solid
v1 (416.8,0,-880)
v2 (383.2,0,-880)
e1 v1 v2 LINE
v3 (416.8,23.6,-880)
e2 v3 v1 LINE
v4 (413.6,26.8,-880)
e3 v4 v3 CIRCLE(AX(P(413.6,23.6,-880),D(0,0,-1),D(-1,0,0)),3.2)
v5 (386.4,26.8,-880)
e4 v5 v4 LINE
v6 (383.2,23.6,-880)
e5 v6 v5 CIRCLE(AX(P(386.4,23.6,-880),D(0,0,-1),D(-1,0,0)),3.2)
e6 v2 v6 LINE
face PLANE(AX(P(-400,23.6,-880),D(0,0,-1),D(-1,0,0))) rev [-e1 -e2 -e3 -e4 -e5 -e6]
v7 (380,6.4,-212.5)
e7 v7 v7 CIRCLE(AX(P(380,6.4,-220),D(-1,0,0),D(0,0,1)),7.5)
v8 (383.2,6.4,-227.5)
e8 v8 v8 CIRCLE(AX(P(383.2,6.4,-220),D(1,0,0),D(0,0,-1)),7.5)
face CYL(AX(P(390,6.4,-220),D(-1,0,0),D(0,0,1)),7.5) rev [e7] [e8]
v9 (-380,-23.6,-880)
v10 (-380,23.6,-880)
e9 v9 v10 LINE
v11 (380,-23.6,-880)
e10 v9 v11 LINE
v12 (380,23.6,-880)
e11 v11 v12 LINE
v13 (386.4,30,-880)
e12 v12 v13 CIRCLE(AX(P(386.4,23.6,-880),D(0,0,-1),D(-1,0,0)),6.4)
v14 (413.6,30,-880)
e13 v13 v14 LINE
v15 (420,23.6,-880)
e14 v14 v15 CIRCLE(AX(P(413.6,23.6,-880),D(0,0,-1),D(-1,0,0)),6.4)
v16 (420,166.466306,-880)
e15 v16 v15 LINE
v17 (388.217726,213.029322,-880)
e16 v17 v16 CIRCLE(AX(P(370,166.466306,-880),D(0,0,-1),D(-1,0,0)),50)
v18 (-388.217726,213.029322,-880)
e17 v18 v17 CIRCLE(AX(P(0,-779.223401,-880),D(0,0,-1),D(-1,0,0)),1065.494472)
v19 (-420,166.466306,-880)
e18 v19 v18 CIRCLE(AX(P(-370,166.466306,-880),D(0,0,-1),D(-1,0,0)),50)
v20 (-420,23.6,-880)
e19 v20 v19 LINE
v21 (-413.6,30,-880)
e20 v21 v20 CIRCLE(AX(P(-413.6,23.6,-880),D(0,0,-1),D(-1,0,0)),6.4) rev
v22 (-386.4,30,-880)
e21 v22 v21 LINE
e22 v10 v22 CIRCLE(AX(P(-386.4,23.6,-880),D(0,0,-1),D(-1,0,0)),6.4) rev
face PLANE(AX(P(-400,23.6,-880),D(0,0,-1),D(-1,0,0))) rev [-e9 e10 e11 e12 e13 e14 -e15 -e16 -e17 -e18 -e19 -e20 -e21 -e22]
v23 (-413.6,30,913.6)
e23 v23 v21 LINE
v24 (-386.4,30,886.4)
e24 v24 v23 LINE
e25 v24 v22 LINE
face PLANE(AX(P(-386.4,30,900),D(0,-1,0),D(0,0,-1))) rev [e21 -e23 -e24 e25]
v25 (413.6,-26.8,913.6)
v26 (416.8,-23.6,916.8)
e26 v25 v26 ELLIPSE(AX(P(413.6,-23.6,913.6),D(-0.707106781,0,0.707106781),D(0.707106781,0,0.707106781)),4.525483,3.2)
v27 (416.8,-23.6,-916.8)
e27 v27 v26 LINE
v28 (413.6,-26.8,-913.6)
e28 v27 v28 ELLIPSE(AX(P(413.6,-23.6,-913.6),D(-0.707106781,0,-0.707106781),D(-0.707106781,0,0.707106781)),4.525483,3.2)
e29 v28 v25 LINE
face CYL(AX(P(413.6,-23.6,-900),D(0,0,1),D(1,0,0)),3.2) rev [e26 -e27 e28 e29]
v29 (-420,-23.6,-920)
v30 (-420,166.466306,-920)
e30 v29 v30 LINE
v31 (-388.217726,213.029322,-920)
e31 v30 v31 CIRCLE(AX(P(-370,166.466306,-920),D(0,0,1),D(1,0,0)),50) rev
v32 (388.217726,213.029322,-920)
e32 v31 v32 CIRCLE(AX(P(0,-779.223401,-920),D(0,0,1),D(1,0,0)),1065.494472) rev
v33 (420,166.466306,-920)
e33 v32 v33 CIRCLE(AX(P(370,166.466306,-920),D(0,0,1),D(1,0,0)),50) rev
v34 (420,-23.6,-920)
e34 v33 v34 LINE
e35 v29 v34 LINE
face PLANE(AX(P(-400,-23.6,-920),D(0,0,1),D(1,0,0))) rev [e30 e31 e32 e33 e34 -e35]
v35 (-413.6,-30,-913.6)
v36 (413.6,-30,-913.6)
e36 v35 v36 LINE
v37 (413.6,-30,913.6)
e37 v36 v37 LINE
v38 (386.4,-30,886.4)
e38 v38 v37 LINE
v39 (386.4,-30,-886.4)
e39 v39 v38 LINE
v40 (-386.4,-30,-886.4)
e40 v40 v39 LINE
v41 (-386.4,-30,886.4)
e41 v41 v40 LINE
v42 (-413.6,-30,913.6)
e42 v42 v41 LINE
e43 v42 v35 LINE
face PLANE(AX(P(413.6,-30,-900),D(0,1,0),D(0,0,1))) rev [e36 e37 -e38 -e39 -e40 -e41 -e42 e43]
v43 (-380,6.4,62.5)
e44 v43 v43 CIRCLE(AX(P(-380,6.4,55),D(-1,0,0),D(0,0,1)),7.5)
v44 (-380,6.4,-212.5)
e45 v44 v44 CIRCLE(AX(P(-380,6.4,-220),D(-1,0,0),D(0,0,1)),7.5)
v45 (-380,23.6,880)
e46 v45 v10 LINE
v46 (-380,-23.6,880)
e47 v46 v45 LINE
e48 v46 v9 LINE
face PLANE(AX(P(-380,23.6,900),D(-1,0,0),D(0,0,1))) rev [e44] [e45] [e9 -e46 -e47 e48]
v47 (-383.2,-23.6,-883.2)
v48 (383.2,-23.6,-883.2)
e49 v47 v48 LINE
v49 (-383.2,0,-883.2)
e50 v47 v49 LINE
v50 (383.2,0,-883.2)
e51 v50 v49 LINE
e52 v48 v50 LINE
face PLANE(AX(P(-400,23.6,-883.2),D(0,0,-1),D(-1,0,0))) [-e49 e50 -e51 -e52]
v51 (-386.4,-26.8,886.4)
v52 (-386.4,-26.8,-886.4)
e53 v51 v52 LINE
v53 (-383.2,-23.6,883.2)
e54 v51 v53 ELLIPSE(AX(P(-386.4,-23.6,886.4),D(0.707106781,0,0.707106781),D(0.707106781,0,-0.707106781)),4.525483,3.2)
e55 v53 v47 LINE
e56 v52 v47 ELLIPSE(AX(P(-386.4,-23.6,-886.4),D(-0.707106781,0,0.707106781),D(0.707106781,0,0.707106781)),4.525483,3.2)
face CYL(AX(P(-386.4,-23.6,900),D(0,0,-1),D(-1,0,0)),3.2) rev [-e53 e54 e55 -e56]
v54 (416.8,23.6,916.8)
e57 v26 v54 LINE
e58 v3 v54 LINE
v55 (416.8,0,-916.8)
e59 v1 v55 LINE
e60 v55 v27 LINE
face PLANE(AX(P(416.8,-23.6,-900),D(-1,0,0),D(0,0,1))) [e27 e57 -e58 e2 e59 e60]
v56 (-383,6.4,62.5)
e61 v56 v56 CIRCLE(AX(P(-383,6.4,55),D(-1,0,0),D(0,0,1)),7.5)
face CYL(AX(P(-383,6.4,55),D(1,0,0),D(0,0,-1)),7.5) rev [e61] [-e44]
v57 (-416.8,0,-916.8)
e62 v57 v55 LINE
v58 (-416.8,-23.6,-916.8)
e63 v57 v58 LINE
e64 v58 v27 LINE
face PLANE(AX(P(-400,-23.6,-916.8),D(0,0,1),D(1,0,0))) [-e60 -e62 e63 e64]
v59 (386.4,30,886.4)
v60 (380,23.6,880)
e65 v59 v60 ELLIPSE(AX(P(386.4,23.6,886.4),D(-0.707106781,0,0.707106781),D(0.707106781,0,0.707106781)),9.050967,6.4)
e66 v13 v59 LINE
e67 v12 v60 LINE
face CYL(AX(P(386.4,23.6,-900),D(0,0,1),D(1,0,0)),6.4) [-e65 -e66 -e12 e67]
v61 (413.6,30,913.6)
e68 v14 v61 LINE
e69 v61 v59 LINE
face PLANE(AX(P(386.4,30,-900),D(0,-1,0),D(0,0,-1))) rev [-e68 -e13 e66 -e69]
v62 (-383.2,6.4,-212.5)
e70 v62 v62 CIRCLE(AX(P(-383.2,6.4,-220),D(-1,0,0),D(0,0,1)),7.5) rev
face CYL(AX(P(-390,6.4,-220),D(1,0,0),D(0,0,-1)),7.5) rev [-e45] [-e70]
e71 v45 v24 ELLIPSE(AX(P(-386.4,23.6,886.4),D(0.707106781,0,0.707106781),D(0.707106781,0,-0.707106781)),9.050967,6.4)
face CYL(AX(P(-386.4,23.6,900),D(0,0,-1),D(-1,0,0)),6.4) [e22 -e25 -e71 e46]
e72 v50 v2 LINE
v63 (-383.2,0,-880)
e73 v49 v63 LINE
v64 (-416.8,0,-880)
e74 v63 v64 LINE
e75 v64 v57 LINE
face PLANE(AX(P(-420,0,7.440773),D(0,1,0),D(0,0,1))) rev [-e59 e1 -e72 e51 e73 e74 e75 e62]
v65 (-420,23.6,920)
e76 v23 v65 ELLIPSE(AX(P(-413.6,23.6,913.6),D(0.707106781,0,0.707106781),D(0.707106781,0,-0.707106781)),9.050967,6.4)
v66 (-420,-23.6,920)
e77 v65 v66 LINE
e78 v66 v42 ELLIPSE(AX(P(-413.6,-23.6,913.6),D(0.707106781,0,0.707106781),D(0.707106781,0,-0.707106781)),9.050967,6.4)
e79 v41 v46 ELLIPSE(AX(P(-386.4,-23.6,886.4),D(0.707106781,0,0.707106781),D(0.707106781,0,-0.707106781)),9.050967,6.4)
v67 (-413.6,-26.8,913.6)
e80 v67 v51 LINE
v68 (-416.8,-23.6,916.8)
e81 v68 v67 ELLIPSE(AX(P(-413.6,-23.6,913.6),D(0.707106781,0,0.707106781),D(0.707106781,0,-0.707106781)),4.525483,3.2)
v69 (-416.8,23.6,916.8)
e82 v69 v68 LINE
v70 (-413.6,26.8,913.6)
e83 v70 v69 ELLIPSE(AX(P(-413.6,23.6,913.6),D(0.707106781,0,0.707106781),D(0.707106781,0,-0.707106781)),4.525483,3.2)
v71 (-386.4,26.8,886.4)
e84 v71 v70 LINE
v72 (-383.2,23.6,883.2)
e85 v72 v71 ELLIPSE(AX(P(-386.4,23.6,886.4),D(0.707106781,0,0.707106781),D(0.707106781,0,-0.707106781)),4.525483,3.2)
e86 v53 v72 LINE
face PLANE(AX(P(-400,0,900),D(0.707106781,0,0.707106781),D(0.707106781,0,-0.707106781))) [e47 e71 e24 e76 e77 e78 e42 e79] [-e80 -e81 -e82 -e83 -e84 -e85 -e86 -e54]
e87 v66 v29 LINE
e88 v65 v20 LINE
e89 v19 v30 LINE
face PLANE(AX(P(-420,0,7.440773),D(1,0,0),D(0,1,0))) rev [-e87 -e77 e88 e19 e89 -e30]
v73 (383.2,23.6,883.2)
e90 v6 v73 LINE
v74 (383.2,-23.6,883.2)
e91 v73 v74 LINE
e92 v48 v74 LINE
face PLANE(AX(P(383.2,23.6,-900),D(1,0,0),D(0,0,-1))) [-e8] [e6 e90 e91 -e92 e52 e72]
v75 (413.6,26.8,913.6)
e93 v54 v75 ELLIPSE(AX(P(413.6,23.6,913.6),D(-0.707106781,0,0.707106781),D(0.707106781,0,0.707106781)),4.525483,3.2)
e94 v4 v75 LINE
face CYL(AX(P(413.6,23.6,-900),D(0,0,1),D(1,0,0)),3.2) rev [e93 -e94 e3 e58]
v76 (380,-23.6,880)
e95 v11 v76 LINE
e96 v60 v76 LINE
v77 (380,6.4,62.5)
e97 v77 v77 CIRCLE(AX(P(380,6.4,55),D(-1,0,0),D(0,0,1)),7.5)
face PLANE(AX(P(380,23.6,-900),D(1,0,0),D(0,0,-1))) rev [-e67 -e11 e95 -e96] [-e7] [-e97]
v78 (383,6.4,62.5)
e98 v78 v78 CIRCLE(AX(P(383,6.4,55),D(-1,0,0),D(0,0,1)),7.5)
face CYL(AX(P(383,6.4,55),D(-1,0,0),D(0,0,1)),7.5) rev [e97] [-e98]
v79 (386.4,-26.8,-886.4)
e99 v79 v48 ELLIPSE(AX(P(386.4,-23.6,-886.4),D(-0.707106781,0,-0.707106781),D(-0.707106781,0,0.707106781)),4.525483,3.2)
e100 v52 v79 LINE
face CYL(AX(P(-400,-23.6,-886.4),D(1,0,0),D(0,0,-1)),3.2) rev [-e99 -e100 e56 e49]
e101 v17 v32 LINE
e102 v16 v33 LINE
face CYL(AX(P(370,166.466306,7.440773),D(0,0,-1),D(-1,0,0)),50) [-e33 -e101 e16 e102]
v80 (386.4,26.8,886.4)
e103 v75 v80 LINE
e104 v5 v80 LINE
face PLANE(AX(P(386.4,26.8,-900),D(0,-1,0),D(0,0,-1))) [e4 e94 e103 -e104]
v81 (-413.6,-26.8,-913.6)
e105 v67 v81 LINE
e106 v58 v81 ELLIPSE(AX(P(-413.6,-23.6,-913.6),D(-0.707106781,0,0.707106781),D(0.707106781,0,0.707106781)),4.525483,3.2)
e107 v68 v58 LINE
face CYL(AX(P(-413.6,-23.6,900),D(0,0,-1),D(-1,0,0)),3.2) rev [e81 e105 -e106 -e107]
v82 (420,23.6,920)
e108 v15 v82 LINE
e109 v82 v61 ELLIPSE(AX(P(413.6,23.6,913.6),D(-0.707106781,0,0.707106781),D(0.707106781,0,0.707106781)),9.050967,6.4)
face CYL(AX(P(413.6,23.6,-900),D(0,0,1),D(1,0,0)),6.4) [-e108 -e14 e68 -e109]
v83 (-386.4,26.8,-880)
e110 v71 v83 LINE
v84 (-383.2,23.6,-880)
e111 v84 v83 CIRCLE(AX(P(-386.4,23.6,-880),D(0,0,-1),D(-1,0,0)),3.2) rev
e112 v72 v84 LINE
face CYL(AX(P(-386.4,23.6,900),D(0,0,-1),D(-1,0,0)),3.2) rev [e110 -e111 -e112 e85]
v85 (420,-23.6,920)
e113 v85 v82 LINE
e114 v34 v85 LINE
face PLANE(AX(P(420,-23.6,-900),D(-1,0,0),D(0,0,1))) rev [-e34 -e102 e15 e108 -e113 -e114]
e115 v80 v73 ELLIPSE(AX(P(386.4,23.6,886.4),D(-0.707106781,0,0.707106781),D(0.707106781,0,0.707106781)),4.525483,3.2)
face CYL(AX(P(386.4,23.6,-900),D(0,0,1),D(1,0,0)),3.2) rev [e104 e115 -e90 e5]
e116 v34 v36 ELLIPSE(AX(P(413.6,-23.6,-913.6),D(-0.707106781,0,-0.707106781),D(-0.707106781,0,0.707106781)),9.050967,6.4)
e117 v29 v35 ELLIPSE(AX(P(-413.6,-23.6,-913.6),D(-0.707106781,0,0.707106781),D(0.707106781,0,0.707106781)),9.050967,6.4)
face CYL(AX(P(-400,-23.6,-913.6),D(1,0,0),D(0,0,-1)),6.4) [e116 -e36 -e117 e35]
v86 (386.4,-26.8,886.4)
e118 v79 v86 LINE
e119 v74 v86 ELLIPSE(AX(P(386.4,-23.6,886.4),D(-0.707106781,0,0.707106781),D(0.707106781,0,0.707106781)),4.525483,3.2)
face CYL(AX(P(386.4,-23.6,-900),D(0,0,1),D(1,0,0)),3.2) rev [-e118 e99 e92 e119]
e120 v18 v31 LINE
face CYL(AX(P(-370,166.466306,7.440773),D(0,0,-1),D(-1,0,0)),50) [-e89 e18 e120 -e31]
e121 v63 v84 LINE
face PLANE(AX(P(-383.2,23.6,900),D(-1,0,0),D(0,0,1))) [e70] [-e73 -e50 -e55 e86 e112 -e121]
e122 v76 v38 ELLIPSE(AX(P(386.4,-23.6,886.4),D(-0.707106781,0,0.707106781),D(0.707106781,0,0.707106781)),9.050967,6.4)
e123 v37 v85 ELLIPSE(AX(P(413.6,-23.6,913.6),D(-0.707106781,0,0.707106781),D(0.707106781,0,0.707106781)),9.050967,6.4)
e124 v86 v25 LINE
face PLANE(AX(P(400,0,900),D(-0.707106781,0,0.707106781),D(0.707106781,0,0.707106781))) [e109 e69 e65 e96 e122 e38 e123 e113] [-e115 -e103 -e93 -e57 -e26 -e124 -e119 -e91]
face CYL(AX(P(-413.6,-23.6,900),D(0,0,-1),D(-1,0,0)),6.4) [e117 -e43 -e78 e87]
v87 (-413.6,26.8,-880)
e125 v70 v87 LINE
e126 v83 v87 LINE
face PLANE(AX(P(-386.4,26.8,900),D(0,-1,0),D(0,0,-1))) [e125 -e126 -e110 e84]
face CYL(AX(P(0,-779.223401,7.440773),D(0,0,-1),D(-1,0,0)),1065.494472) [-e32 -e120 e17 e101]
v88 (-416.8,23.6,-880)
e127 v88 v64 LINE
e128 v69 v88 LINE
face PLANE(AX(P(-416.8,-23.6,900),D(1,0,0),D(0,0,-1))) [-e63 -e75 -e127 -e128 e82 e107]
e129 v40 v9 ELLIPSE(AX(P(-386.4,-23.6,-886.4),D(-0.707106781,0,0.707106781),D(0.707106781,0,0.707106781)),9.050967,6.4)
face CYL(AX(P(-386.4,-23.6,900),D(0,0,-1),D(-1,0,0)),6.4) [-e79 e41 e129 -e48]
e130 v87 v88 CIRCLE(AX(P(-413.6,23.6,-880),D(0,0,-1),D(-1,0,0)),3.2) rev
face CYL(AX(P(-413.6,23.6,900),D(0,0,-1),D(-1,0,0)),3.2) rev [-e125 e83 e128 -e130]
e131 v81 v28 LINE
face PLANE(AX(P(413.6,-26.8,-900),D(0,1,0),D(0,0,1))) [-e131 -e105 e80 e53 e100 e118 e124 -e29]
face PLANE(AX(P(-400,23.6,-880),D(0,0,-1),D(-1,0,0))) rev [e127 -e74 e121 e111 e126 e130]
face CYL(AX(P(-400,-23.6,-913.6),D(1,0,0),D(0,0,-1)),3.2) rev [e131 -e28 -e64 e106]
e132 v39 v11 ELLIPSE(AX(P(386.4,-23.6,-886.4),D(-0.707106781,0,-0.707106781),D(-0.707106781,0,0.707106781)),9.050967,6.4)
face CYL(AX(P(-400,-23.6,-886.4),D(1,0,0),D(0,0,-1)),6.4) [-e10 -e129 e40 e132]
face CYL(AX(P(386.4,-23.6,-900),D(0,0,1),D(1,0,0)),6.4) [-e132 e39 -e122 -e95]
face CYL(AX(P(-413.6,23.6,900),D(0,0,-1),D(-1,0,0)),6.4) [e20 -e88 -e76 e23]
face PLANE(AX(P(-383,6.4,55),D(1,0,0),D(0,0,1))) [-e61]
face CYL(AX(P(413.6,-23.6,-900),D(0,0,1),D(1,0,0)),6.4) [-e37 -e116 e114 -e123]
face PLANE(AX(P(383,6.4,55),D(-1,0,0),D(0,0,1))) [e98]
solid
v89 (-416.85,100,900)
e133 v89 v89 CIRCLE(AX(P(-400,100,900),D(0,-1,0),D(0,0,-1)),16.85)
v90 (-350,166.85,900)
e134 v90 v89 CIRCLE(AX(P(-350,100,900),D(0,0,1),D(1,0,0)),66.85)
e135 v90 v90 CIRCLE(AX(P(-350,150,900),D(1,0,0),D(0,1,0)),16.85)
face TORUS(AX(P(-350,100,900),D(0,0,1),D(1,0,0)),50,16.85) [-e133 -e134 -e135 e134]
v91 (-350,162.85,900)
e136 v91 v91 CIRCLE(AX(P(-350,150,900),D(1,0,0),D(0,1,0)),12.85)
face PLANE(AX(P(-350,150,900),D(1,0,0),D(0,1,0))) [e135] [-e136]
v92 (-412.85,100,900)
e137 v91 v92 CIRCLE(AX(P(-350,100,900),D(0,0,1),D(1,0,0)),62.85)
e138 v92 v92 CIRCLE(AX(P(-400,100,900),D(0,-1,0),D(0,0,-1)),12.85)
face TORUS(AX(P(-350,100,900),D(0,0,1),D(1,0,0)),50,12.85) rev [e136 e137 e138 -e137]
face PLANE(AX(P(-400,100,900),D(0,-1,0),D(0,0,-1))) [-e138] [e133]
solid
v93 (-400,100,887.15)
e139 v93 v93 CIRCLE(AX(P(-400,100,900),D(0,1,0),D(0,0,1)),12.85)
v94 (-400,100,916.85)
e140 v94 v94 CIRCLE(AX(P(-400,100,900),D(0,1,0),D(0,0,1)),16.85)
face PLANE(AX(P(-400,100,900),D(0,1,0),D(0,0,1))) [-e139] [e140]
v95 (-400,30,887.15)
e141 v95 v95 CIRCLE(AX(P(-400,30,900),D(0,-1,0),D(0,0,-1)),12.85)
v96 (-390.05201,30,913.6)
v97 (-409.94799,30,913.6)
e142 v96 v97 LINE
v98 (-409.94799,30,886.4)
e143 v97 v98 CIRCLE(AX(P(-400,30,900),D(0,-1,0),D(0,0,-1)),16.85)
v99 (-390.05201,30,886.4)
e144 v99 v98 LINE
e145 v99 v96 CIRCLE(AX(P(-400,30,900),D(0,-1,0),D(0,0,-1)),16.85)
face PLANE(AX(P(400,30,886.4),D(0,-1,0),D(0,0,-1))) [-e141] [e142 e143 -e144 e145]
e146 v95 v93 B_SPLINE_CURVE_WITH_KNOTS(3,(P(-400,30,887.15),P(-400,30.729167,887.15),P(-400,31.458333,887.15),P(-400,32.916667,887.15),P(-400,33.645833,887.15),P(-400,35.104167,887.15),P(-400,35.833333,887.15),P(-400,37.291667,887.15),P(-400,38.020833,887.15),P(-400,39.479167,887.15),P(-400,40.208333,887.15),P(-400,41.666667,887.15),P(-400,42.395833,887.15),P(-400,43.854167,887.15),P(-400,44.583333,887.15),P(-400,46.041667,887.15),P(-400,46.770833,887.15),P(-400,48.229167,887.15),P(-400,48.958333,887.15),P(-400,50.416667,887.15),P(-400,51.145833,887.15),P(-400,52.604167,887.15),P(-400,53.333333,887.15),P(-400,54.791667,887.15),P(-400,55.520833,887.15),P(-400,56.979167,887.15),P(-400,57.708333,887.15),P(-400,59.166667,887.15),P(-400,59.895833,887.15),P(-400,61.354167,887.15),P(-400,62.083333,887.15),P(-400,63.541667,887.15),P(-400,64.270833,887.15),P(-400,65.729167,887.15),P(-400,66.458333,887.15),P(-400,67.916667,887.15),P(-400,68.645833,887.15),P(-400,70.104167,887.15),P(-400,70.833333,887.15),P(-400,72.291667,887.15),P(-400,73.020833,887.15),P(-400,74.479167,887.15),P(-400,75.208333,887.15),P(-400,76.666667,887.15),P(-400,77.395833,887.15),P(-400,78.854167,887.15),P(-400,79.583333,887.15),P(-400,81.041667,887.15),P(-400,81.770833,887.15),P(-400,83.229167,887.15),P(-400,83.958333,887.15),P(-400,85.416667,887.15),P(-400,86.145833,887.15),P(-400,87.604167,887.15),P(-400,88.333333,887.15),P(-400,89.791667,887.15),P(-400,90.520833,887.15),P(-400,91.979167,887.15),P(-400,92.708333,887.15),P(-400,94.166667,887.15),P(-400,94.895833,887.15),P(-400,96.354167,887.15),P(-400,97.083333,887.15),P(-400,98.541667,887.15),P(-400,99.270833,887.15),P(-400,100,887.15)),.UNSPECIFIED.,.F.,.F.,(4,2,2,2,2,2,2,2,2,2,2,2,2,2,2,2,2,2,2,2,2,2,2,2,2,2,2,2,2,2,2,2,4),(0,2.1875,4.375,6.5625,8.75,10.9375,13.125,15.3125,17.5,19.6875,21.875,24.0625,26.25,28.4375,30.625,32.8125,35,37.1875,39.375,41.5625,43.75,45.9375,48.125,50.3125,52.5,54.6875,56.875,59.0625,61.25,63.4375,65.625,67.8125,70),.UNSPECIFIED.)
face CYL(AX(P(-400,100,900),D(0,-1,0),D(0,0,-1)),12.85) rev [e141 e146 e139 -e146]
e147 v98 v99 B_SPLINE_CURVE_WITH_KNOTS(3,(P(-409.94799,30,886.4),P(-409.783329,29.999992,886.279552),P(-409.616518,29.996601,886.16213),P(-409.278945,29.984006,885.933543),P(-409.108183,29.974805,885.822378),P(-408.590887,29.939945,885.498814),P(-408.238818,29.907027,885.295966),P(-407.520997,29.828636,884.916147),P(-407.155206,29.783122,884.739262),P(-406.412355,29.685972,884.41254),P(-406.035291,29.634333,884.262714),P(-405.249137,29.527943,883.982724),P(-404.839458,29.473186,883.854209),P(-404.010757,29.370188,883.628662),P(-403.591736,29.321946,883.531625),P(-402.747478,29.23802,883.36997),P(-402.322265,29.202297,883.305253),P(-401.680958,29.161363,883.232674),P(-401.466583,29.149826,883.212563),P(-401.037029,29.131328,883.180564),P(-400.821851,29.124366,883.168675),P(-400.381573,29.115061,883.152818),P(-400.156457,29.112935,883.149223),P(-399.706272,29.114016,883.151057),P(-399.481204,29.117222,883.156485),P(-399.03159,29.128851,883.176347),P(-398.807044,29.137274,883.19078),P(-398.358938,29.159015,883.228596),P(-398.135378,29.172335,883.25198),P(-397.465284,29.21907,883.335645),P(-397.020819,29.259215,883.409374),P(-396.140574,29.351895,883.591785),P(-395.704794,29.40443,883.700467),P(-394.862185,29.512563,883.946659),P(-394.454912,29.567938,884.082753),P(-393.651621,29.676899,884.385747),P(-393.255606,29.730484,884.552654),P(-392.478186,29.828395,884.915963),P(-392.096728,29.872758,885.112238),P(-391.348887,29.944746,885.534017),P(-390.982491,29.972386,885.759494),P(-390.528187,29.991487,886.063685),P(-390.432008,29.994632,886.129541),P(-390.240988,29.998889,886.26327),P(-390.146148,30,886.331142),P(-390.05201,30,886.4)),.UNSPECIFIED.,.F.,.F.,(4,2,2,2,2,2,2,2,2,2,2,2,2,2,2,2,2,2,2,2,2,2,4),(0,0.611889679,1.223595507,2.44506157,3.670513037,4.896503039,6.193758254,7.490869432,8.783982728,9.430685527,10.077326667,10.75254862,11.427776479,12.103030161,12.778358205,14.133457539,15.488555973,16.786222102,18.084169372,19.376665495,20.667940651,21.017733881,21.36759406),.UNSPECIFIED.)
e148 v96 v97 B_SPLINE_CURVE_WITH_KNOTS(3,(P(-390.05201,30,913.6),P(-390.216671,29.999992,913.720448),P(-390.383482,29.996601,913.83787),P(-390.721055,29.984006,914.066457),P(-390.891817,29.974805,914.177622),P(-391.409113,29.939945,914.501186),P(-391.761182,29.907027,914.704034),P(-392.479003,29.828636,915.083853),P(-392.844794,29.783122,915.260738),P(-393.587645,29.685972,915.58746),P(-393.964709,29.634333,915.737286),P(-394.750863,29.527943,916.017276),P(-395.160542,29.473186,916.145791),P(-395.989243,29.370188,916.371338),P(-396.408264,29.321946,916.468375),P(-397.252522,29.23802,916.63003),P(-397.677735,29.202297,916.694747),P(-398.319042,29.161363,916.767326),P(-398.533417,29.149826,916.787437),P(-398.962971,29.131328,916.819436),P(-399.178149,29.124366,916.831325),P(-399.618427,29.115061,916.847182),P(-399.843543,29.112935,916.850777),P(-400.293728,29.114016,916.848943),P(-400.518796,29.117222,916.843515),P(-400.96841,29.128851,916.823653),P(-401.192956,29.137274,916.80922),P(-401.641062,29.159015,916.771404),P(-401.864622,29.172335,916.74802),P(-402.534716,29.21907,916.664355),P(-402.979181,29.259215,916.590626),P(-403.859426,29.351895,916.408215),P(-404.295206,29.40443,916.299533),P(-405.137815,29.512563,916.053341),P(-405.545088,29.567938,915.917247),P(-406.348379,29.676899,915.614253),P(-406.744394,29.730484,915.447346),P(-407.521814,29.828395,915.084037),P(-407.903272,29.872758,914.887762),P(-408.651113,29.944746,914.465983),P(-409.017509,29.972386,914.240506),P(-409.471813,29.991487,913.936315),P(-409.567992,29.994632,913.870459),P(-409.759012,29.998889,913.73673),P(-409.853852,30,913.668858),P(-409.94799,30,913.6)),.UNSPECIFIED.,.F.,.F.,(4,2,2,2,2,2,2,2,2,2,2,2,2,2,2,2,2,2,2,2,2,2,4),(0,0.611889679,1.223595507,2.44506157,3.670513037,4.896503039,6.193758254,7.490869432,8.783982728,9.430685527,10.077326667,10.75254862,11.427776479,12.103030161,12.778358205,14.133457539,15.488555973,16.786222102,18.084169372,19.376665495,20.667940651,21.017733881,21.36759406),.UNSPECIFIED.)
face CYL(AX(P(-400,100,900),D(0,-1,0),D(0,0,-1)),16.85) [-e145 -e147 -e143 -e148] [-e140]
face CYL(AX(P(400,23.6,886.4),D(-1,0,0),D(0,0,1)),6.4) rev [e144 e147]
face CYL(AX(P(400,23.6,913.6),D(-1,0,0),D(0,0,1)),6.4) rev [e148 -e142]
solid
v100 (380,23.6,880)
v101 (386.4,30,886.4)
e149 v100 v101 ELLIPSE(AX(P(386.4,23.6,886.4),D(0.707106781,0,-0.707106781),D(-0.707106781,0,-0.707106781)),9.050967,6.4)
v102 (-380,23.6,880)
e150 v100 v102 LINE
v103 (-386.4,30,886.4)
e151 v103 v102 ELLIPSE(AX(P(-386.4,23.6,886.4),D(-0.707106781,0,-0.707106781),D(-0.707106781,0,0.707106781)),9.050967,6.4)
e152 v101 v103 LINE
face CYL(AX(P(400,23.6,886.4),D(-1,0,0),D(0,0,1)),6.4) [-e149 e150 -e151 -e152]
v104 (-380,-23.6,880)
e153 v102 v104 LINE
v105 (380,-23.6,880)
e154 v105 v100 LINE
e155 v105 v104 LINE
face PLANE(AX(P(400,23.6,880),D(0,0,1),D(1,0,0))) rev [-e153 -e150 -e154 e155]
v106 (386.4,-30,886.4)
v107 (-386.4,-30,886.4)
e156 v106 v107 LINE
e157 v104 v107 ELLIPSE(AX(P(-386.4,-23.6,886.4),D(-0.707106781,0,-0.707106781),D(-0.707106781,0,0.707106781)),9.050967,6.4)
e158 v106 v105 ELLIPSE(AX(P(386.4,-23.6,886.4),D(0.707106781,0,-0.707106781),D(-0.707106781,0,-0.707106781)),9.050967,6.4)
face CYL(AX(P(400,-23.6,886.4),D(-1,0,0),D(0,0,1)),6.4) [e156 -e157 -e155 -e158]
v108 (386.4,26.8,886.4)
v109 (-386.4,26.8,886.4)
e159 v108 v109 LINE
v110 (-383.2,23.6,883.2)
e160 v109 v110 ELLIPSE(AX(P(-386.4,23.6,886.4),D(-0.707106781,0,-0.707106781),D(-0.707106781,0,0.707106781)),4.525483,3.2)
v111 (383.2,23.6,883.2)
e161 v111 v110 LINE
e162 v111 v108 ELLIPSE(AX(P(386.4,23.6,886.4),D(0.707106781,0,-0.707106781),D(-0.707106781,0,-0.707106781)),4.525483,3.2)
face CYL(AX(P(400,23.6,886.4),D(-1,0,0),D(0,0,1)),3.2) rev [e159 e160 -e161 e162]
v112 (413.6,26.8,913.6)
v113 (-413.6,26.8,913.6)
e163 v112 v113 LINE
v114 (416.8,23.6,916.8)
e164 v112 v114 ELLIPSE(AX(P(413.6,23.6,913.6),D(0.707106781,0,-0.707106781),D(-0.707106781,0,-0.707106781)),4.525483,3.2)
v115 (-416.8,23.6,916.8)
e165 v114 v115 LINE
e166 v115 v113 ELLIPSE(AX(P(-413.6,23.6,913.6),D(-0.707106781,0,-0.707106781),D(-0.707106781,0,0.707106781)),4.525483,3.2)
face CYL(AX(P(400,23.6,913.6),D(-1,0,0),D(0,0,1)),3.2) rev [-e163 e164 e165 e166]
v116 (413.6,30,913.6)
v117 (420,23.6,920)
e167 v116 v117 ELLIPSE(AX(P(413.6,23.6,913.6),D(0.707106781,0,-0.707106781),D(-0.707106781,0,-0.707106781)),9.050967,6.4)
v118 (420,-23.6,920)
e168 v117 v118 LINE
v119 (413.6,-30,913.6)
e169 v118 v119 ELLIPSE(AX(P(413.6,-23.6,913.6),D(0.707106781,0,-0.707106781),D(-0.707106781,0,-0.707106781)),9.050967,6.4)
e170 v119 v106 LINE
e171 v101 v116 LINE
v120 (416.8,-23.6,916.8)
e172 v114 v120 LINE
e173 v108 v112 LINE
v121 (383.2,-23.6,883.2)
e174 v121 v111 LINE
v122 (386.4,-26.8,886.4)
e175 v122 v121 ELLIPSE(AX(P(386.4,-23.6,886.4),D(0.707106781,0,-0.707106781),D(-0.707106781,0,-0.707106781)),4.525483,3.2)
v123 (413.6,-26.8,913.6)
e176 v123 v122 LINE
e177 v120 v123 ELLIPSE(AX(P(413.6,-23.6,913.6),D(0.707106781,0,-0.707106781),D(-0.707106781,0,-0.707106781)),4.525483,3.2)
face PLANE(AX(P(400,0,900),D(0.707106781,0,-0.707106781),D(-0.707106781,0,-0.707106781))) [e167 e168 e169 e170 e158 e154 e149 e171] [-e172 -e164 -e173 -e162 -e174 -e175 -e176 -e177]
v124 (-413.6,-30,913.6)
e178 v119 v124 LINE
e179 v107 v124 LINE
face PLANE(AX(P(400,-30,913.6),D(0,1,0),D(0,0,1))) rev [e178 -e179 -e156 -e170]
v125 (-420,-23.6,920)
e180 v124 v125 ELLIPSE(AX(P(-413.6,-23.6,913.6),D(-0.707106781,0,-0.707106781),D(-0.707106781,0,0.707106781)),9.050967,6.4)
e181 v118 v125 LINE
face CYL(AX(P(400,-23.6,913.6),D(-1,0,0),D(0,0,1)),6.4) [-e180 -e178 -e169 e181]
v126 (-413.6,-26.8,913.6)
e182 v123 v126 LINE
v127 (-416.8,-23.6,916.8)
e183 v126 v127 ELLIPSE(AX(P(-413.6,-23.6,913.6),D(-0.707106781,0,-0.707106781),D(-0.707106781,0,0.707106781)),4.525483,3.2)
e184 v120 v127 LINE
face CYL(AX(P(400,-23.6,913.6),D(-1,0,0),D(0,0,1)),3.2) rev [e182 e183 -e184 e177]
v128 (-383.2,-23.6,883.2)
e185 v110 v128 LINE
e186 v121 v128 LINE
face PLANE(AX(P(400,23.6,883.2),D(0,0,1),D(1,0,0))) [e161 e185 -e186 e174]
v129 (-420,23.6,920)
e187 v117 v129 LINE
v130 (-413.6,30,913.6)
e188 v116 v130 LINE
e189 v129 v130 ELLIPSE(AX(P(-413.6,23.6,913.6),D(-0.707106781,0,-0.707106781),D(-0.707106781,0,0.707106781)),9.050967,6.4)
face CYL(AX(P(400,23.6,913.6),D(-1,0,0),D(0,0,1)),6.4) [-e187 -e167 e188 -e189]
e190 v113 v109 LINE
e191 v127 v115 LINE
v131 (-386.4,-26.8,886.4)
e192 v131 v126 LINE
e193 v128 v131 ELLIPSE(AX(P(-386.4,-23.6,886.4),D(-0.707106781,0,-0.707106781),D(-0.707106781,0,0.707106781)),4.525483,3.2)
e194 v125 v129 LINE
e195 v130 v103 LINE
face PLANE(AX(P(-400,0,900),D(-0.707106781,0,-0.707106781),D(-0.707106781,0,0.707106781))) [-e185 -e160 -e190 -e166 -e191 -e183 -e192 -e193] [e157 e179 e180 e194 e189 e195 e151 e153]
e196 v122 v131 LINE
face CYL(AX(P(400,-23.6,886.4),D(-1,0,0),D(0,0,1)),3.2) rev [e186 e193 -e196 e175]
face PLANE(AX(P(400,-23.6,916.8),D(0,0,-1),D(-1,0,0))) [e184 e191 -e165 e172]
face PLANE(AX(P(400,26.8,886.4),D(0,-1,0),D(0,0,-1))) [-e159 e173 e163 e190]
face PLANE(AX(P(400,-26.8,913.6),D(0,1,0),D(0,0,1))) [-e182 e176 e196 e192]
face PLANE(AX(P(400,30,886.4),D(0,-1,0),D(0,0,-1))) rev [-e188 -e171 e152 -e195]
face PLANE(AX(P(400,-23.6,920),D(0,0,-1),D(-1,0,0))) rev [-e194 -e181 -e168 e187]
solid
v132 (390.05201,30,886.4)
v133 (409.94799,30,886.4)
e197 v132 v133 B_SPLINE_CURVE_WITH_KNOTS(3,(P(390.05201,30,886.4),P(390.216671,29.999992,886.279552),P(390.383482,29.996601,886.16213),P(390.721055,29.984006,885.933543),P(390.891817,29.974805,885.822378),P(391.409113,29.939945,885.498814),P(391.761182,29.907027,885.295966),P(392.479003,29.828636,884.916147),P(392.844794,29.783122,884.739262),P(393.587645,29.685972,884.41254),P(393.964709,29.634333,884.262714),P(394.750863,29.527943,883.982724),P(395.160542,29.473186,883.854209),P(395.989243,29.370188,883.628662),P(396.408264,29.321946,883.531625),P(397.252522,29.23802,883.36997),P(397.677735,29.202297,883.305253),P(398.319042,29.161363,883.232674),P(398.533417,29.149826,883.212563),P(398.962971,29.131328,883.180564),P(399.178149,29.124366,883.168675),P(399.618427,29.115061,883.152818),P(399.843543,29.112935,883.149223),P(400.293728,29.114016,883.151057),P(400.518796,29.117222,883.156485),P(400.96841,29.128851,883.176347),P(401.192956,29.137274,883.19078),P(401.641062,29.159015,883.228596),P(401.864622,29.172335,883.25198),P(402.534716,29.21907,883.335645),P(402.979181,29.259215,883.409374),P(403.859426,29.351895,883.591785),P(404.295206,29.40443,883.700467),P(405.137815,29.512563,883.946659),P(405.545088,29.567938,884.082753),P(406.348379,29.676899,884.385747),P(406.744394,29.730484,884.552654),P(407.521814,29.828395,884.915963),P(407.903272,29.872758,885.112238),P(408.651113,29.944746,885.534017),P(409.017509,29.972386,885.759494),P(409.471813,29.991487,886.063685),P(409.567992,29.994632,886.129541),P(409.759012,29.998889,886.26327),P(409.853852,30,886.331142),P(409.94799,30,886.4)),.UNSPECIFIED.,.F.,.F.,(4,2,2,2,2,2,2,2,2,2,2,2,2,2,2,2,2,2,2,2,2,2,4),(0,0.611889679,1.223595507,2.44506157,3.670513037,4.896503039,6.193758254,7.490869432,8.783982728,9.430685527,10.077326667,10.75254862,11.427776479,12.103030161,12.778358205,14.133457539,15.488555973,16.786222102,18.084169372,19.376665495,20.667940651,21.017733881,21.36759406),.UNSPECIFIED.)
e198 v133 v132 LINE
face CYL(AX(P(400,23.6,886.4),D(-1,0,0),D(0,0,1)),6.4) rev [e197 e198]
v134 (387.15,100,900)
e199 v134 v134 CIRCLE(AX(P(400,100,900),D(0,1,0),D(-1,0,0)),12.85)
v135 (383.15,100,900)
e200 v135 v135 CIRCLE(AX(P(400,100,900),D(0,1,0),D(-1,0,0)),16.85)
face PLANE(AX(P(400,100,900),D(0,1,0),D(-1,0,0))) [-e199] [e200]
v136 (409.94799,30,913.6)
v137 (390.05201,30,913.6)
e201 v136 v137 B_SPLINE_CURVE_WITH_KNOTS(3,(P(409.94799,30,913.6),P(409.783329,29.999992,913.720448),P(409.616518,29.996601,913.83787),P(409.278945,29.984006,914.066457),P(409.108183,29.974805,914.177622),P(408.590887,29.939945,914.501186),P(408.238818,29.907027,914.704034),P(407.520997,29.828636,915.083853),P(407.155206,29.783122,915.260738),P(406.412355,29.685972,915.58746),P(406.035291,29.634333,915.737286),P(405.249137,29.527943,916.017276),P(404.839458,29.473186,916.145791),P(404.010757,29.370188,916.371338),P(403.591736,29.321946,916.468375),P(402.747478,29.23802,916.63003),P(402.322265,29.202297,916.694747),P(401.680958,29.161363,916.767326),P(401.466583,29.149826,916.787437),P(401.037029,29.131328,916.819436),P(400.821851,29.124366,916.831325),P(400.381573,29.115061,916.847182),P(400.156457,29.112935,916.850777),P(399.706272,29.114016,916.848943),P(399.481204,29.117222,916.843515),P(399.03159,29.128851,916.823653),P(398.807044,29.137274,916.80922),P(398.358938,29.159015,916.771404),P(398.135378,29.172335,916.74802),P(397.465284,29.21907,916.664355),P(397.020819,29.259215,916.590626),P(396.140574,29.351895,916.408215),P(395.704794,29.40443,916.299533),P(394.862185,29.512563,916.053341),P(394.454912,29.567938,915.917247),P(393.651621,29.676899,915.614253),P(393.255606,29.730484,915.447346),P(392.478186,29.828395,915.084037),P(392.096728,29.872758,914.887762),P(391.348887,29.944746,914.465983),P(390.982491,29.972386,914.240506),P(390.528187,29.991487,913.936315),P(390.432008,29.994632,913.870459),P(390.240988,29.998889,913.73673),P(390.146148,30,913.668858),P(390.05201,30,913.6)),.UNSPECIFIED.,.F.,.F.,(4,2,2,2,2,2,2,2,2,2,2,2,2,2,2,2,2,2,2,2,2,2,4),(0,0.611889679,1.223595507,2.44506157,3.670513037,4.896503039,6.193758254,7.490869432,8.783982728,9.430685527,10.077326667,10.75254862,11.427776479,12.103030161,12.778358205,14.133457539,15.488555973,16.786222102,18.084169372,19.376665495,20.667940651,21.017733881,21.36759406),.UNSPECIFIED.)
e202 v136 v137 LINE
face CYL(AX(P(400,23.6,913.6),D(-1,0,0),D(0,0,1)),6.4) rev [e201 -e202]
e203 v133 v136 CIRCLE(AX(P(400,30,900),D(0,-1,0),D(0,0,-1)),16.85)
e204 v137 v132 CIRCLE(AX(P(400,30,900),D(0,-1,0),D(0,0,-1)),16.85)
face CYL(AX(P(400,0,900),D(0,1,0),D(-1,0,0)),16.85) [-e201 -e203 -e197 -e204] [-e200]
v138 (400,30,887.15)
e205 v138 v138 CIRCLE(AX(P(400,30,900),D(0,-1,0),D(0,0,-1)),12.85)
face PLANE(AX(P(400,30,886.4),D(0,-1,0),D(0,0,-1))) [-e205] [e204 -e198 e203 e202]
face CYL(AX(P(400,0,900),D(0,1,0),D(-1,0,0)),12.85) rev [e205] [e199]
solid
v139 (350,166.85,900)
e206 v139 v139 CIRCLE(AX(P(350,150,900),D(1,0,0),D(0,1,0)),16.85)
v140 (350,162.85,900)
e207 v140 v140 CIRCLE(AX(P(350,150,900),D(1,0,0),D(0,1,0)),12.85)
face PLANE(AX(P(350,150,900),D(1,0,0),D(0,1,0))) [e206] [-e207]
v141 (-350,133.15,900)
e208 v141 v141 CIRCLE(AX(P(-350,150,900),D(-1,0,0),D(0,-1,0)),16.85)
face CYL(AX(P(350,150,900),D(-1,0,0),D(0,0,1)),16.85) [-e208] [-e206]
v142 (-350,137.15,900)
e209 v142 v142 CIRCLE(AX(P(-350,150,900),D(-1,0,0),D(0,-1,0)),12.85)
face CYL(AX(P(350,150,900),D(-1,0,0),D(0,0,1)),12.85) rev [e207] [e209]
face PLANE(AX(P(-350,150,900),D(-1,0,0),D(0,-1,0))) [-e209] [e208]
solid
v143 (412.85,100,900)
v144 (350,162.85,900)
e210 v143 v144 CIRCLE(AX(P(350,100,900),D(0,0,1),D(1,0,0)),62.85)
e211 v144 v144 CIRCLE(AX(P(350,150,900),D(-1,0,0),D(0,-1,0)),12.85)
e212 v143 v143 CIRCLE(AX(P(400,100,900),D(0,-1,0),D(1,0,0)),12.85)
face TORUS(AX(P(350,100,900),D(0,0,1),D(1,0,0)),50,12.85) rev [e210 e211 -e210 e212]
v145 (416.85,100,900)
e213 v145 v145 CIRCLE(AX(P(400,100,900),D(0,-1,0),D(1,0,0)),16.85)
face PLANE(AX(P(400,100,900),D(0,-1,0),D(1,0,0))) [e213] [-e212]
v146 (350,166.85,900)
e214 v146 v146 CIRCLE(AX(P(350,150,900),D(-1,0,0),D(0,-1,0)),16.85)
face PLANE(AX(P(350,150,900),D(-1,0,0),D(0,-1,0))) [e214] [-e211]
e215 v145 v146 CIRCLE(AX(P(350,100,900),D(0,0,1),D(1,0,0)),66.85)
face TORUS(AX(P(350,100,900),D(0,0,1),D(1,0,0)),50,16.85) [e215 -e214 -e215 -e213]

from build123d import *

# Parameters (mm, degrees)
RECTANGULAR_TUBE_CONFIGURED_60_X_40_X_DEPTH      = 837.055512755
RECTANGULAR_TUBE_CONFIGURED_60_X_40_X_DEPTH_BACK = 37.055512755
RECTANGULAR_TUBE_CONFIGURED_60_X_4_4_DEPTH       = 1874.111025509
RECTANGULAR_TUBE_CONFIGURED_60_X_4_6_DEPTH       = 874.111025509
RECTANGULAR_TUBE_CONFIGURED_60_X_4_8_DEPTH       = 1874.111025509
BOSS_EXTRUDE1_REACH                              = 1870.074
BOSS_EXTRUDE1_DIRECTION_2_REACH                  = 1870.074
SKETCH15_R                                       = 16.85
SKETCH15_R_2                                     = 12.85
PIPE_CONFIGURED_33_7_X_4_0_1_DEPTH               = 100
SKETCH15_ON_SEGMENT_2_R                          = 16.85
SKETCH15_ON_SEGMENT_2_R_2                        = 12.85
PIPE_CONFIGURED_33_7_X_4_0_1_2_ANGLE             = 90
SKETCH15_ON_SEGMENT_3_R                          = 16.85
SKETCH15_ON_SEGMENT_3_R_2                        = 12.85
PIPE_CONFIGURED_33_7_X_4_0_1_3_DEPTH             = 700
SKETCH15_ON_SEGMENT_4_R                          = 16.85
SKETCH15_ON_SEGMENT_4_R_2                        = 12.85
PIPE_CONFIGURED_33_7_X_4_0_1_4_ANGLE             = 90
SKETCH15_ON_SEGMENT_5_R                          = 16.85
SKETCH15_ON_SEGMENT_5_R_2                        = 12.85
PIPE_CONFIGURED_33_7_X_4_0_1_5_DEPTH             = 100
TRIM_EXTEND1_START                               = 382
TRIM_EXTEND1_DEPTH                               = 34.85
TRIM_EXTEND1_START_2                             = -418
TRIM_EXTEND1_2_DEPTH                             = 36
SKETCH27_R                                       = 7.5
CUT_EXTRUDE3_DEPTH                               = 10
SKETCH28_R                                       = 7.5
CUT_EXTRUDE4_DEPTH                               = 3


with BuildPart() as part:
    # Sketch12 → Rectangular tube - configured 60 X 40 X 3.2(1) (new, two sides: drawn at the far end of the back side and taken through both)
    with BuildSketch(Plane(origin=(-400, 0, 900), x_dir=(0, 0, -1), z_dir=(1, 0, 0)).offset(-RECTANGULAR_TUBE_CONFIGURED_60_X_40_X_DEPTH_BACK)):
        with BuildLine():
            Line((-13.6, -30), (13.6, -30))
            ThreePointArc((13.6, -30), (18.1254834, -28.1254834), (20, -23.6))
            Line((20, -23.6), (20, 23.6))
            ThreePointArc((20, 23.6), (18.1254834, 28.1254834), (13.6, 30))
            Line((13.6, 30), (-13.6, 30))
            ThreePointArc((-13.6, 30), (-18.1254834, 28.1254834), (-20, 23.6))
            Line((-20, 23.6), (-20, -23.6))
            ThreePointArc((-20, -23.6), (-18.1254834, -28.1254834), (-13.6, -30))
        make_face()
        with BuildLine():
            Line((-13.6, -26.8), (13.6, -26.8))
            ThreePointArc((13.6, -26.8), (15.8627417, -25.8627417), (16.8, -23.6))
            Line((16.8, -23.6), (16.8, 23.6))
            ThreePointArc((16.8, 23.6), (15.8627417, 25.8627417), (13.6, 26.8))
            Line((13.6, 26.8), (-13.6, 26.8))
            ThreePointArc((-13.6, 26.8), (-15.8627417, 25.8627417), (-16.8, 23.6))
            Line((-16.8, 23.6), (-16.8, -23.6))
            ThreePointArc((-16.8, -23.6), (-15.8627417, -25.8627417), (-13.6, -26.8))
        make_face(mode=Mode.SUBTRACT)
    extrude(amount=RECTANGULAR_TUBE_CONFIGURED_60_X_40_X_DEPTH + RECTANGULAR_TUBE_CONFIGURED_60_X_40_X_DEPTH_BACK)

    # Rectangular tube - configured 60 X 4 2
    split(bisect_by=Plane(origin=(-400, 0, 900), x_dir=(0, 1, 0), z_dir=(0.707106781, 0, 0.707106781)), keep=Keep.TOP)

    # Rectangular tube - configured 60 X 4 3
    split(bisect_by=Plane(origin=(400, 0, 900), x_dir=(0, -1, 0), z_dir=(-0.707106781, 0, 0.707106781)), keep=Keep.TOP)


with BuildPart() as body_2:
    # Sketch12 on segment 2 (carried to segment 2) → Rectangular tube - configured 60 X 4 4 (new body)
    with BuildSketch(Plane(origin=(400, 0, 937.055512755), x_dir=(-1, 0, 0), z_dir=(0, 0, -1))):
        with BuildLine():
            Line((-13.6, -30), (13.6, -30))
            ThreePointArc((13.6, -30), (18.1254834, -28.1254834), (20, -23.6))
            Line((20, -23.6), (20, 23.6))
            ThreePointArc((20, 23.6), (18.1254834, 28.1254834), (13.6, 30))
            Line((13.6, 30), (-13.6, 30))
            ThreePointArc((-13.6, 30), (-18.1254834, 28.1254834), (-20, 23.6))
            Line((-20, 23.6), (-20, -23.6))
            ThreePointArc((-20, -23.6), (-18.1254834, -28.1254834), (-13.6, -30))
        make_face()
        with BuildLine():
            Line((-13.6, -26.8), (13.6, -26.8))
            ThreePointArc((13.6, -26.8), (15.8627417, -25.8627417), (16.8, -23.6))
            Line((16.8, -23.6), (16.8, 23.6))
            ThreePointArc((16.8, 23.6), (15.8627417, 25.8627417), (13.6, 26.8))
            Line((13.6, 26.8), (-13.6, 26.8))
            ThreePointArc((-13.6, 26.8), (-15.8627417, 25.8627417), (-16.8, 23.6))
            Line((-16.8, 23.6), (-16.8, -23.6))
            ThreePointArc((-16.8, -23.6), (-15.8627417, -25.8627417), (-13.6, -26.8))
        make_face(mode=Mode.SUBTRACT)
    extrude(amount=RECTANGULAR_TUBE_CONFIGURED_60_X_4_4_DEPTH)

    # Rectangular tube - configured 60 X 4 4 m
    split(bisect_by=Plane(origin=(400, 0, -900), x_dir=(0, 1, 0), z_dir=(0.707106781, 0, 0.707106781)), keep=Keep.TOP)

    # Rectangular tube - configured 60 X 4 5
    split(bisect_by=Plane(origin=(400, 0, 900), x_dir=(0, 1, 0), z_dir=(0.707106781, 0, -0.707106781)), keep=Keep.TOP)


with BuildPart() as body_3:
    # Sketch12 on segment 3 (carried to segment 3) → Rectangular tube - configured 60 X 4 6 (new body)
    with BuildSketch(Plane(origin=(437.055512755, 0, -900), x_dir=(0, 0, 1), z_dir=(-1, 0, 0))):
        with BuildLine():
            Line((-13.6, -30), (13.6, -30))
            ThreePointArc((13.6, -30), (18.1254834, -28.1254834), (20, -23.6))
            Line((20, -23.6), (20, 23.6))
            ThreePointArc((20, 23.6), (18.1254834, 28.1254834), (13.6, 30))
            Line((13.6, 30), (-13.6, 30))
            ThreePointArc((-13.6, 30), (-18.1254834, 28.1254834), (-20, 23.6))
            Line((-20, 23.6), (-20, -23.6))
            ThreePointArc((-20, -23.6), (-18.1254834, -28.1254834), (-13.6, -30))
        make_face()
        with BuildLine():
            Line((-13.6, -26.8), (13.6, -26.8))
            ThreePointArc((13.6, -26.8), (15.8627417, -25.8627417), (16.8, -23.6))
            Line((16.8, -23.6), (16.8, 23.6))
            ThreePointArc((16.8, 23.6), (15.8627417, 25.8627417), (13.6, 26.8))
            Line((13.6, 26.8), (-13.6, 26.8))
            ThreePointArc((-13.6, 26.8), (-15.8627417, 25.8627417), (-16.8, 23.6))
            Line((-16.8, 23.6), (-16.8, -23.6))
            ThreePointArc((-16.8, -23.6), (-15.8627417, -25.8627417), (-13.6, -26.8))
        make_face(mode=Mode.SUBTRACT)
    extrude(amount=RECTANGULAR_TUBE_CONFIGURED_60_X_4_6_DEPTH)

    # Rectangular tube - configured 60 X 4 6 m
    split(bisect_by=Plane(origin=(-400, 0, -900), x_dir=(0, 1, 0), z_dir=(0.707106781, 0, -0.707106781)), keep=Keep.TOP)

    # Rectangular tube - configured 60 X 4 7
    split(bisect_by=Plane(origin=(400, 0, -900), x_dir=(0, -1, 0), z_dir=(-0.707106781, 0, -0.707106781)), keep=Keep.TOP)

    # Boss-Extrude1: up to this face of the body (flat: up to its plane)
    boss_extrude1_end = Plane(body_3.part.faces().sort_by_distance((0, 0, -880))[0])
    # Sketch13 → Boss-Extrude1 (add, up to the picked face)
    with BuildSketch(Plane.XY.offset(-900), mode=Mode.PRIVATE) as boss_extrude1_sk1:
        with BuildLine():
            Line((-420, 0), (-420, 166.466305982))
            ThreePointArc((-420, 166.466305982), (-411.297011379, 194.654190811), (-388.217725954, 213.029322004))
            ThreePointArc((-388.217725954, 213.029322004), (0, 286.271070586), (388.217725954, 213.029322004))
            ThreePointArc((388.217725954, 213.029322004), (411.297011379, 194.654190811), (420, 166.466305982))
            Line((420, 166.466305982), (420, 0))
            Line((420, 0), (-420, 0))
        make_face()
    boss_extrude1_tool1 = split(extrude(boss_extrude1_sk1.sketch, amount=BOSS_EXTRUDE1_REACH, mode=Mode.PRIVATE), bisect_by=boss_extrude1_end, keep=Keep.BOTH, mode=Mode.PRIVATE)

    add(body_2.part)  # Boss-Extrude1 merges body 2


with BuildPart() as body_4:
    # Sketch12 on segment 4 (carried to segment 4) → Rectangular tube - configured 60 X 4 8 (new body)
    with BuildSketch(Plane(origin=(-400, 0, -937.055512755), x_dir=(1, 0, 0), z_dir=(0, 0, 1))):
        with BuildLine():
            Line((-13.6, -30), (13.6, -30))
            ThreePointArc((13.6, -30), (18.1254834, -28.1254834), (20, -23.6))
            Line((20, -23.6), (20, 23.6))
            ThreePointArc((20, 23.6), (18.1254834, 28.1254834), (13.6, 30))
            Line((13.6, 30), (-13.6, 30))
            ThreePointArc((-13.6, 30), (-18.1254834, 28.1254834), (-20, 23.6))
            Line((-20, 23.6), (-20, -23.6))
            ThreePointArc((-20, -23.6), (-18.1254834, -28.1254834), (-13.6, -30))
        make_face()
        with BuildLine():
            Line((-13.6, -26.8), (13.6, -26.8))
            ThreePointArc((13.6, -26.8), (15.8627417, -25.8627417), (16.8, -23.6))
            Line((16.8, -23.6), (16.8, 23.6))
            ThreePointArc((16.8, 23.6), (15.8627417, 25.8627417), (13.6, 26.8))
            Line((13.6, 26.8), (-13.6, 26.8))
            ThreePointArc((-13.6, 26.8), (-15.8627417, 25.8627417), (-16.8, 23.6))
            Line((-16.8, 23.6), (-16.8, -23.6))
            ThreePointArc((-16.8, -23.6), (-15.8627417, -25.8627417), (-13.6, -26.8))
        make_face(mode=Mode.SUBTRACT)
    extrude(amount=RECTANGULAR_TUBE_CONFIGURED_60_X_4_8_DEPTH)

    # Rectangular tube - configured 60 X 4 8 m
    split(bisect_by=Plane(origin=(-400, 0, -900), x_dir=(0, -1, 0), z_dir=(-0.707106781, 0, 0.707106781)), keep=Keep.TOP)

    # Rectangular tube - configured 60 X 4 9
    split(bisect_by=Plane(origin=(-400, 0, 900), x_dir=(0, -1, 0), z_dir=(-0.707106781, 0, -0.707106781)), keep=Keep.TOP)


with BuildPart() as body_3_1:
    add(body_3.part)

    add(body_4.part)  # Boss-Extrude1 merges body 4
    add(boss_extrude1_tool1.solids().sort_by(Axis((0, 130.141696, -900), (0, 0, 1)))[0])

    # Boss-Extrude1 direction 2: up to this face of the body (flat: up to its plane)
    boss_extrude1_direction_2_end = Plane(body_3_1.part.faces().sort_by_distance((0, 0, -920))[0])
    # Sketch13 → Boss-Extrude1 direction 2 (add, up to the picked face)
    with BuildSketch(Plane.XY.offset(-900), mode=Mode.PRIVATE) as boss_extrude1_direction_2_sk1:
        with BuildLine():
            Line((-420, 0), (-420, 166.466305982))
            ThreePointArc((-420, 166.466305982), (-411.297011379, 194.654190811), (-388.217725954, 213.029322004))
            ThreePointArc((-388.217725954, 213.029322004), (0, 286.271070586), (388.217725954, 213.029322004))
            ThreePointArc((388.217725954, 213.029322004), (411.297011379, 194.654190811), (420, 166.466305982))
            Line((420, 166.466305982), (420, 0))
            Line((420, 0), (-420, 0))
        make_face()
    boss_extrude1_direction_2_tool1 = split(extrude(boss_extrude1_direction_2_sk1.sketch, amount=-BOSS_EXTRUDE1_DIRECTION_2_REACH, mode=Mode.PRIVATE), bisect_by=boss_extrude1_direction_2_end, keep=Keep.BOTH, mode=Mode.PRIVATE)
    add(boss_extrude1_direction_2_tool1.solids().sort_by(Axis((0, 130.141696, -900), (0, 0, -1)))[0])

    # Sketch27 → Cut-Extrude3 (cut)
    with BuildSketch(Plane.ZY.offset(-380)):
        with Locations((-220, 6.4)):
            Circle(SKETCH27_R)
    cut_extrude3 = extrude(amount=-CUT_EXTRUDE3_DEPTH, mode=Mode.SUBTRACT)

    # Mirror1: Cut-Extrude3 across plane
    add(cut_extrude3.mirror(Plane(origin=(0, 0, 0), x_dir=(0, 0, 1), z_dir=(1, 0, 0))), mode=Mode.SUBTRACT)

    # Sketch28 → Cut-Extrude4 (cut)
    with BuildSketch(Plane.ZY.offset(-380)):
        with Locations((55, 6.4)):
            Circle(SKETCH28_R)
    cut_extrude4 = extrude(amount=-CUT_EXTRUDE4_DEPTH, mode=Mode.SUBTRACT)

    # Mirror2: Cut-Extrude4 across plane
    add(cut_extrude4.mirror(Plane(origin=(0, 0, 0), x_dir=(0, 0, 1), z_dir=(1, 0, 0))), mode=Mode.SUBTRACT)


with BuildPart() as body_3_2:
    # Sketch15 → Pipe - configured 33.7 X 4.0(1) (new body)
    with BuildSketch(Plane(origin=(-400, 0, 900), x_dir=(-1, 0, 0), z_dir=(0, 1, 0))):
        Circle(SKETCH15_R)
        Circle(SKETCH15_R_2, mode=Mode.SUBTRACT)
    extrude(amount=PIPE_CONFIGURED_33_7_X_4_0_1_DEPTH)

    # Trim_Extend1 2 outline → Trim_Extend1 2 (cut)
    with BuildSketch(Plane.YZ.offset(TRIM_EXTEND1_START_2)):
        with BuildLine():
            ThreePointArc((29.11304873, 883.149416406), (29.774281815, 884.715291104), (30, 886.4))
            Line((30, 886.4), (30, 913.6))
            ThreePointArc((30, 913.6), (29.774281815, 915.284708896), (29.11304873, 916.850583594))
            Line((29.11304873, 916.850583594), (28.435334041, 918))
            Line((28.435334041, 918), (0, 918))
            Line((0, 918), (0, 882))
            Line((0, 882), (28.435334041, 882))
            Line((28.435334041, 882), (29.11304873, 883.149416406))
        make_face()
    extrude(amount=TRIM_EXTEND1_2_DEPTH, mode=Mode.SUBTRACT)


with BuildPart() as body_4_2:
    # Sketch15 on segment 2 (carried to the start of arc 2) → Pipe - configured 33.7 X 4.0_1 2 (revolve)
    with BuildSketch(Plane(origin=(-400, 100, 900), x_dir=(-1, 0, 0), z_dir=(0, 1, 0))):
        Circle(SKETCH15_ON_SEGMENT_2_R)
        Circle(SKETCH15_ON_SEGMENT_2_R_2, mode=Mode.SUBTRACT)
    revolve(axis=Axis((-350, 100, 900), (0, 0, -1)), revolution_arc=PIPE_CONFIGURED_33_7_X_4_0_1_2_ANGLE)


with BuildPart() as body_5:
    # Sketch15 on segment 3 (carried to segment 3) → Pipe - configured 33.7 X 4.0_1 3 (new body)
    with BuildSketch(Plane(origin=(-350, 150, 900), x_dir=(0, 1, 0), z_dir=(1, 0, 0))):
        Circle(SKETCH15_ON_SEGMENT_3_R)
        Circle(SKETCH15_ON_SEGMENT_3_R_2, mode=Mode.SUBTRACT)
    extrude(amount=PIPE_CONFIGURED_33_7_X_4_0_1_3_DEPTH)


with BuildPart() as body_6:
    # Sketch15 on segment 4 (carried to the start of arc 4) → Pipe - configured 33.7 X 4.0_1 4 (revolve)
    with BuildSketch(Plane(origin=(350, 150, 900), x_dir=(0, 1, 0), z_dir=(1, 0, 0))):
        Circle(SKETCH15_ON_SEGMENT_4_R)
        Circle(SKETCH15_ON_SEGMENT_4_R_2, mode=Mode.SUBTRACT)
    revolve(axis=Axis((350, 100, 900), (0, 0, -1)), revolution_arc=PIPE_CONFIGURED_33_7_X_4_0_1_4_ANGLE)


with BuildPart() as body_7:
    # Sketch15 on segment 5 (carried to segment 5) → Pipe - configured 33.7 X 4.0_1 5 (new body)
    with BuildSketch(Plane(origin=(400, 0, 900), x_dir=(-1, 0, 0), z_dir=(0, 1, 0))):
        Circle(SKETCH15_ON_SEGMENT_5_R)
        Circle(SKETCH15_ON_SEGMENT_5_R_2, mode=Mode.SUBTRACT)
    extrude(amount=PIPE_CONFIGURED_33_7_X_4_0_1_5_DEPTH)

    # Trim/Extend1: read off the stored shape, not the designer's step
    # Trim/Extend1 outline → Trim/Extend1 (cut)
    with BuildSketch(Plane.YZ.offset(TRIM_EXTEND1_START)):
        with BuildLine():
            ThreePointArc((29.11304873, 883.149416406), (29.774281815, 884.715291104), (30, 886.4))
            Line((30, 886.4), (30, 913.6))
            ThreePointArc((30, 913.6), (29.774281815, 915.284708896), (29.11304873, 916.850583594))
            Line((29.11304873, 916.850583594), (28.435334041, 918))
            Line((28.435334041, 918), (0, 918))
            Line((0, 918), (0, 882))
            Line((0, 882), (28.435334041, 882))
            Line((28.435334041, 882), (29.11304873, 883.149416406))
        make_face()
    extrude(amount=TRIM_EXTEND1_DEPTH, mode=Mode.SUBTRACT)


solid = Compound([part.part, body_3_1.part, body_3_2.part, body_4_2.part, body_5.part, body_6.part, body_7.part])
